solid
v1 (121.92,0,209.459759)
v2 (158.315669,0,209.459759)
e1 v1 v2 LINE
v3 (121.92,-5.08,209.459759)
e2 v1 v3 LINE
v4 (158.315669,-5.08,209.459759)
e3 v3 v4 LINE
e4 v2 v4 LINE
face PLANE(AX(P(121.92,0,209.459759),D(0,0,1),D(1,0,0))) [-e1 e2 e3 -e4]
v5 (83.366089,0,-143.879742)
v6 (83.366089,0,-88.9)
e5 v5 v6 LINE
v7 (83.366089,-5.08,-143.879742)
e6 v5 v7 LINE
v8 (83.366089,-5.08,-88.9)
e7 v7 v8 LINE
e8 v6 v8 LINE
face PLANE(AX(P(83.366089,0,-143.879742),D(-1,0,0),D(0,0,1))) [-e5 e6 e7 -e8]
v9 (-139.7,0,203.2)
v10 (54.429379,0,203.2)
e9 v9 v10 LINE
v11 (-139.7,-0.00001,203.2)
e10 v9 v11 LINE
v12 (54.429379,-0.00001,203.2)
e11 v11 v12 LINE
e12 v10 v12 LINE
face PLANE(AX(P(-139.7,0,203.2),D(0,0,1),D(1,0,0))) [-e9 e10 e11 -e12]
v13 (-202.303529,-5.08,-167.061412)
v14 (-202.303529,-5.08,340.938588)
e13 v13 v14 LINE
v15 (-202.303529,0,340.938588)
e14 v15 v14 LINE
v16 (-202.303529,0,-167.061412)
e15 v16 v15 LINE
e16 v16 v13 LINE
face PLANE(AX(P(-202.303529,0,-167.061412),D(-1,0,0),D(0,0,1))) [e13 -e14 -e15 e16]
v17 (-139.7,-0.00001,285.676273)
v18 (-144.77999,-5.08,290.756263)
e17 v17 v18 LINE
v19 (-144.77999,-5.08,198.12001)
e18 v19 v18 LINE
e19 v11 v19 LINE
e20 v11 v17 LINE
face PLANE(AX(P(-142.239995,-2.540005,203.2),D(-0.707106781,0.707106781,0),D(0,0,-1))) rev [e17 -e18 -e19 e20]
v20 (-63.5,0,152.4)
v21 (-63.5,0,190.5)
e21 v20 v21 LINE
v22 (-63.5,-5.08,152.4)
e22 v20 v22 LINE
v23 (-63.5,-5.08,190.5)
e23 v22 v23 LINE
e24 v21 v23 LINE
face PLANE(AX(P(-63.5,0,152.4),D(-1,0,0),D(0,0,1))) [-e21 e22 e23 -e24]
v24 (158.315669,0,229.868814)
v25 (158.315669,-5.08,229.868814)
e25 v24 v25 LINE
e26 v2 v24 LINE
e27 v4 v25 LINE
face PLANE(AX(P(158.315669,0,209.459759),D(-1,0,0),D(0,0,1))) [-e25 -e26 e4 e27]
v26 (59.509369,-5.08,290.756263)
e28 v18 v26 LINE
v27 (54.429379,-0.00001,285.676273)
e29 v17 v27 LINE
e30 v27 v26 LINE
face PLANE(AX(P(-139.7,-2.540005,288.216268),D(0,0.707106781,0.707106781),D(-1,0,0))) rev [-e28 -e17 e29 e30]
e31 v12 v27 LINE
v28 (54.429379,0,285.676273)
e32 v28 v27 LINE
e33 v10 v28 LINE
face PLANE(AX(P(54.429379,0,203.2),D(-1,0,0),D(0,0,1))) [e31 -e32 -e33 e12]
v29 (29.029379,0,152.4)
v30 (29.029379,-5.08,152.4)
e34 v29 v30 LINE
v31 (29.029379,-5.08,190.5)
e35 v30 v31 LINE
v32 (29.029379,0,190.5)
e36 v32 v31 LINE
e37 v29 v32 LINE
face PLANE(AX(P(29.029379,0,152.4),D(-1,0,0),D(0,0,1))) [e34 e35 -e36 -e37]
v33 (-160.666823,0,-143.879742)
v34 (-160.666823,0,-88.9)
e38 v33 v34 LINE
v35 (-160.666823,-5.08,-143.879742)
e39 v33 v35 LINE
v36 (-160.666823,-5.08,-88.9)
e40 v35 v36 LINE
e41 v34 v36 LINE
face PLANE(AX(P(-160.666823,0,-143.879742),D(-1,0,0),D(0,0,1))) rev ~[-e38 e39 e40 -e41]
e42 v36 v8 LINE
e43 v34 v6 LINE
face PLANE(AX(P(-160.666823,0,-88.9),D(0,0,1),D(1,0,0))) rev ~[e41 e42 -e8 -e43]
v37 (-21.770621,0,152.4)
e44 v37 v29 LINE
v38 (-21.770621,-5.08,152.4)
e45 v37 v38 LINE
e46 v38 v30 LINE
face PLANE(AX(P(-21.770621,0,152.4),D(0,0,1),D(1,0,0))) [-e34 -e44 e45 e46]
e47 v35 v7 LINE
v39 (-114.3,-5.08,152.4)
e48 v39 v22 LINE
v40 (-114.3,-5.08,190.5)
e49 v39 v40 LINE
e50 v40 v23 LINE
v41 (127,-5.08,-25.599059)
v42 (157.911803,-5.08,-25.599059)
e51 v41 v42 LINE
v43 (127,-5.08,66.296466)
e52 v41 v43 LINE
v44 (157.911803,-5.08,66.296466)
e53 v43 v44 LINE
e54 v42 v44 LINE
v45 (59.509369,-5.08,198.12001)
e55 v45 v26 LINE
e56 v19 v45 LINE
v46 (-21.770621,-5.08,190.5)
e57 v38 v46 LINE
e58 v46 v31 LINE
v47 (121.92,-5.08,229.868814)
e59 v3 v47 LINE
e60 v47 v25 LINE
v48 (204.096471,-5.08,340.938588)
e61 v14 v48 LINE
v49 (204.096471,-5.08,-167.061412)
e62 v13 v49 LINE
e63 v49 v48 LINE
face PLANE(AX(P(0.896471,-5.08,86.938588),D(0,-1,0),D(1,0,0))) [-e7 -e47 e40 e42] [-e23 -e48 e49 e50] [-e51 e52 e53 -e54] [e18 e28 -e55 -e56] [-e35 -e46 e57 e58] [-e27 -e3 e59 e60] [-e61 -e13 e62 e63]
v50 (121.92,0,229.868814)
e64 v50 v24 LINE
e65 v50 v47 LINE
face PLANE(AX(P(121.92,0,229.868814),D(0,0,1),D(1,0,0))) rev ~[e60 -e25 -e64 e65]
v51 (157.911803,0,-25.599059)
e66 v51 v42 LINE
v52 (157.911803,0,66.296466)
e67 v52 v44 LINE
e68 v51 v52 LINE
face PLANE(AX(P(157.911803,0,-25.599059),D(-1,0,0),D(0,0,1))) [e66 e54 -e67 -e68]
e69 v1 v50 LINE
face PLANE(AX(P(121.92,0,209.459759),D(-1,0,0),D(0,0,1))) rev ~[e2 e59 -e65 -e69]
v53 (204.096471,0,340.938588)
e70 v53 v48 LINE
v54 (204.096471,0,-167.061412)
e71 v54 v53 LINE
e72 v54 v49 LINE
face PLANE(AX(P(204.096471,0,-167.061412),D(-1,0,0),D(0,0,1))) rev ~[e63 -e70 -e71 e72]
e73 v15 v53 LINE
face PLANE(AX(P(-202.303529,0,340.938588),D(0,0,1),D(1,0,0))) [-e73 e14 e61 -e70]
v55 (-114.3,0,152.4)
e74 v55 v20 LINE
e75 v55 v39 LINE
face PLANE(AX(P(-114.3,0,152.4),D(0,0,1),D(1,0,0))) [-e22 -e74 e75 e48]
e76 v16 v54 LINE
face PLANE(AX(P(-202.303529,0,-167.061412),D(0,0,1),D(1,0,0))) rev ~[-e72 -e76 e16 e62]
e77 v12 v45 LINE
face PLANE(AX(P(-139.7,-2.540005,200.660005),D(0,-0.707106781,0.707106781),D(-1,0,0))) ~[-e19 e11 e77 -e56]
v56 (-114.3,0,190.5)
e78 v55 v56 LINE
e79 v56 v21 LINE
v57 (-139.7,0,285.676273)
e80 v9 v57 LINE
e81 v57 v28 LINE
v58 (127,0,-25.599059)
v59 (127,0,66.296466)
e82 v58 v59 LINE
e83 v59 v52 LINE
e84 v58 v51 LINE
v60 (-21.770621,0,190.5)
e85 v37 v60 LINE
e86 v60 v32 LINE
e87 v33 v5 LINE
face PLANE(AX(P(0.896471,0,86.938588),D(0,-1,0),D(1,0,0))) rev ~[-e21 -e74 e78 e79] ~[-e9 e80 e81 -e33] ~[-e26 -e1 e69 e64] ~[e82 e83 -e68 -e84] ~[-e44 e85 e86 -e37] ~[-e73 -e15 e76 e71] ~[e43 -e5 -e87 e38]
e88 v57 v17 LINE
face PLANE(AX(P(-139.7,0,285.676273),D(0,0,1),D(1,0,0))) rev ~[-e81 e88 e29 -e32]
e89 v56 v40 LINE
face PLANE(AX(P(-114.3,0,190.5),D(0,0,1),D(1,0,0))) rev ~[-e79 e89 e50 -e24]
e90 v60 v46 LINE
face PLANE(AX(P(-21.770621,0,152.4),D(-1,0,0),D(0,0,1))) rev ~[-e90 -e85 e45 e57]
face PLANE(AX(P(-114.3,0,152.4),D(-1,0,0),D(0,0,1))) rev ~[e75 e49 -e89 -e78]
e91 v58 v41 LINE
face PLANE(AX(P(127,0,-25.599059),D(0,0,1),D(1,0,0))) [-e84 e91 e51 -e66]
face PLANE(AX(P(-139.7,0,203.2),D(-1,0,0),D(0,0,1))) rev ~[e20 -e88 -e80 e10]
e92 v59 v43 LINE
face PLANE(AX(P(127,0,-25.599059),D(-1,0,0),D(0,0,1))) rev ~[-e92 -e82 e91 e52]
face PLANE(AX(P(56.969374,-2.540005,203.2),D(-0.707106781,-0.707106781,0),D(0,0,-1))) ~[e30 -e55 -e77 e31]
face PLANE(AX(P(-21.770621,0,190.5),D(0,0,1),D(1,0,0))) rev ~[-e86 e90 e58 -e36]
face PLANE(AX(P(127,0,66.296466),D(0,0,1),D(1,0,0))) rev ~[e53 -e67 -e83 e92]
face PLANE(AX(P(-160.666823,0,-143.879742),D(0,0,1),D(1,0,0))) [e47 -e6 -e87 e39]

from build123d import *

# Parameters (mm, degrees)
F0_W     = 406.4
F0_H     = 508
F0_W_2   = 244.0329119563
F0_H_2   = 54.9797415733
F0_W_3   = 30.9118032455
F0_H_3   = 91.8955244124
F0_W_4   = 50.8
F0_H_4   = 38.1
F0_W_5   = 194.1293792814
F0_H_5   = 82.4762731791
F0_W_6   = 36.3956689835
F0_H_6   = 20.4090550542
F1_DEPTH = 5.08
F2_SIZE  = 5.07999


# Not quite as in the source:
# - a fillet or chamfer is up to 0.001 mm smaller than in the source, because OpenCascade refuses the exact size


with BuildPart() as f1:
    # F0 (on Front) → F1 (new body)
    with BuildSketch(Plane.XZ):
        with Locations((0.8964706212, 86.9385877169)):
            Rectangle(F0_W, F0_H)
        with Locations((-38.650367409, -116.3898707867)):
            Rectangle(F0_W_2, F0_H_2, mode=Mode.SUBTRACT)
        with Locations((142.4559016228, 20.3487034887)):
            Rectangle(F0_W_3, F0_H_3, mode=Mode.SUBTRACT)
        with Locations((-88.9, 171.45)):
            Rectangle(F0_W_4, F0_H_4, mode=Mode.SUBTRACT)
        with Locations((-42.6353103593, 244.4381365895)):
            Rectangle(F0_W_5, F0_H_5, mode=Mode.SUBTRACT)
        with Locations((3.6293792814, 171.45)):
            Rectangle(F0_W_4, F0_H_4, mode=Mode.SUBTRACT)
        with Locations((140.1178344917, 219.6642868221)):
            Rectangle(F0_W_6, F0_H_6, mode=Mode.SUBTRACT)
    extrude(amount=F1_DEPTH)

    # F2 (size 5.08 in the source; OpenCascade refuses exactly that, so slightly less here)
    f2_edges = [f1.edges().sort_by_distance(p)[0] for p in [
        (-139.7, -5.08, 244.438137),
        (-42.63531, -5.08, 285.676273),
        (54.429379, -5.08, 244.438137),
        (-42.63531, -5.08, 203.2),
    ]]
    chamfer(f2_edges, length=F2_SIZE)


solid = f1.part
